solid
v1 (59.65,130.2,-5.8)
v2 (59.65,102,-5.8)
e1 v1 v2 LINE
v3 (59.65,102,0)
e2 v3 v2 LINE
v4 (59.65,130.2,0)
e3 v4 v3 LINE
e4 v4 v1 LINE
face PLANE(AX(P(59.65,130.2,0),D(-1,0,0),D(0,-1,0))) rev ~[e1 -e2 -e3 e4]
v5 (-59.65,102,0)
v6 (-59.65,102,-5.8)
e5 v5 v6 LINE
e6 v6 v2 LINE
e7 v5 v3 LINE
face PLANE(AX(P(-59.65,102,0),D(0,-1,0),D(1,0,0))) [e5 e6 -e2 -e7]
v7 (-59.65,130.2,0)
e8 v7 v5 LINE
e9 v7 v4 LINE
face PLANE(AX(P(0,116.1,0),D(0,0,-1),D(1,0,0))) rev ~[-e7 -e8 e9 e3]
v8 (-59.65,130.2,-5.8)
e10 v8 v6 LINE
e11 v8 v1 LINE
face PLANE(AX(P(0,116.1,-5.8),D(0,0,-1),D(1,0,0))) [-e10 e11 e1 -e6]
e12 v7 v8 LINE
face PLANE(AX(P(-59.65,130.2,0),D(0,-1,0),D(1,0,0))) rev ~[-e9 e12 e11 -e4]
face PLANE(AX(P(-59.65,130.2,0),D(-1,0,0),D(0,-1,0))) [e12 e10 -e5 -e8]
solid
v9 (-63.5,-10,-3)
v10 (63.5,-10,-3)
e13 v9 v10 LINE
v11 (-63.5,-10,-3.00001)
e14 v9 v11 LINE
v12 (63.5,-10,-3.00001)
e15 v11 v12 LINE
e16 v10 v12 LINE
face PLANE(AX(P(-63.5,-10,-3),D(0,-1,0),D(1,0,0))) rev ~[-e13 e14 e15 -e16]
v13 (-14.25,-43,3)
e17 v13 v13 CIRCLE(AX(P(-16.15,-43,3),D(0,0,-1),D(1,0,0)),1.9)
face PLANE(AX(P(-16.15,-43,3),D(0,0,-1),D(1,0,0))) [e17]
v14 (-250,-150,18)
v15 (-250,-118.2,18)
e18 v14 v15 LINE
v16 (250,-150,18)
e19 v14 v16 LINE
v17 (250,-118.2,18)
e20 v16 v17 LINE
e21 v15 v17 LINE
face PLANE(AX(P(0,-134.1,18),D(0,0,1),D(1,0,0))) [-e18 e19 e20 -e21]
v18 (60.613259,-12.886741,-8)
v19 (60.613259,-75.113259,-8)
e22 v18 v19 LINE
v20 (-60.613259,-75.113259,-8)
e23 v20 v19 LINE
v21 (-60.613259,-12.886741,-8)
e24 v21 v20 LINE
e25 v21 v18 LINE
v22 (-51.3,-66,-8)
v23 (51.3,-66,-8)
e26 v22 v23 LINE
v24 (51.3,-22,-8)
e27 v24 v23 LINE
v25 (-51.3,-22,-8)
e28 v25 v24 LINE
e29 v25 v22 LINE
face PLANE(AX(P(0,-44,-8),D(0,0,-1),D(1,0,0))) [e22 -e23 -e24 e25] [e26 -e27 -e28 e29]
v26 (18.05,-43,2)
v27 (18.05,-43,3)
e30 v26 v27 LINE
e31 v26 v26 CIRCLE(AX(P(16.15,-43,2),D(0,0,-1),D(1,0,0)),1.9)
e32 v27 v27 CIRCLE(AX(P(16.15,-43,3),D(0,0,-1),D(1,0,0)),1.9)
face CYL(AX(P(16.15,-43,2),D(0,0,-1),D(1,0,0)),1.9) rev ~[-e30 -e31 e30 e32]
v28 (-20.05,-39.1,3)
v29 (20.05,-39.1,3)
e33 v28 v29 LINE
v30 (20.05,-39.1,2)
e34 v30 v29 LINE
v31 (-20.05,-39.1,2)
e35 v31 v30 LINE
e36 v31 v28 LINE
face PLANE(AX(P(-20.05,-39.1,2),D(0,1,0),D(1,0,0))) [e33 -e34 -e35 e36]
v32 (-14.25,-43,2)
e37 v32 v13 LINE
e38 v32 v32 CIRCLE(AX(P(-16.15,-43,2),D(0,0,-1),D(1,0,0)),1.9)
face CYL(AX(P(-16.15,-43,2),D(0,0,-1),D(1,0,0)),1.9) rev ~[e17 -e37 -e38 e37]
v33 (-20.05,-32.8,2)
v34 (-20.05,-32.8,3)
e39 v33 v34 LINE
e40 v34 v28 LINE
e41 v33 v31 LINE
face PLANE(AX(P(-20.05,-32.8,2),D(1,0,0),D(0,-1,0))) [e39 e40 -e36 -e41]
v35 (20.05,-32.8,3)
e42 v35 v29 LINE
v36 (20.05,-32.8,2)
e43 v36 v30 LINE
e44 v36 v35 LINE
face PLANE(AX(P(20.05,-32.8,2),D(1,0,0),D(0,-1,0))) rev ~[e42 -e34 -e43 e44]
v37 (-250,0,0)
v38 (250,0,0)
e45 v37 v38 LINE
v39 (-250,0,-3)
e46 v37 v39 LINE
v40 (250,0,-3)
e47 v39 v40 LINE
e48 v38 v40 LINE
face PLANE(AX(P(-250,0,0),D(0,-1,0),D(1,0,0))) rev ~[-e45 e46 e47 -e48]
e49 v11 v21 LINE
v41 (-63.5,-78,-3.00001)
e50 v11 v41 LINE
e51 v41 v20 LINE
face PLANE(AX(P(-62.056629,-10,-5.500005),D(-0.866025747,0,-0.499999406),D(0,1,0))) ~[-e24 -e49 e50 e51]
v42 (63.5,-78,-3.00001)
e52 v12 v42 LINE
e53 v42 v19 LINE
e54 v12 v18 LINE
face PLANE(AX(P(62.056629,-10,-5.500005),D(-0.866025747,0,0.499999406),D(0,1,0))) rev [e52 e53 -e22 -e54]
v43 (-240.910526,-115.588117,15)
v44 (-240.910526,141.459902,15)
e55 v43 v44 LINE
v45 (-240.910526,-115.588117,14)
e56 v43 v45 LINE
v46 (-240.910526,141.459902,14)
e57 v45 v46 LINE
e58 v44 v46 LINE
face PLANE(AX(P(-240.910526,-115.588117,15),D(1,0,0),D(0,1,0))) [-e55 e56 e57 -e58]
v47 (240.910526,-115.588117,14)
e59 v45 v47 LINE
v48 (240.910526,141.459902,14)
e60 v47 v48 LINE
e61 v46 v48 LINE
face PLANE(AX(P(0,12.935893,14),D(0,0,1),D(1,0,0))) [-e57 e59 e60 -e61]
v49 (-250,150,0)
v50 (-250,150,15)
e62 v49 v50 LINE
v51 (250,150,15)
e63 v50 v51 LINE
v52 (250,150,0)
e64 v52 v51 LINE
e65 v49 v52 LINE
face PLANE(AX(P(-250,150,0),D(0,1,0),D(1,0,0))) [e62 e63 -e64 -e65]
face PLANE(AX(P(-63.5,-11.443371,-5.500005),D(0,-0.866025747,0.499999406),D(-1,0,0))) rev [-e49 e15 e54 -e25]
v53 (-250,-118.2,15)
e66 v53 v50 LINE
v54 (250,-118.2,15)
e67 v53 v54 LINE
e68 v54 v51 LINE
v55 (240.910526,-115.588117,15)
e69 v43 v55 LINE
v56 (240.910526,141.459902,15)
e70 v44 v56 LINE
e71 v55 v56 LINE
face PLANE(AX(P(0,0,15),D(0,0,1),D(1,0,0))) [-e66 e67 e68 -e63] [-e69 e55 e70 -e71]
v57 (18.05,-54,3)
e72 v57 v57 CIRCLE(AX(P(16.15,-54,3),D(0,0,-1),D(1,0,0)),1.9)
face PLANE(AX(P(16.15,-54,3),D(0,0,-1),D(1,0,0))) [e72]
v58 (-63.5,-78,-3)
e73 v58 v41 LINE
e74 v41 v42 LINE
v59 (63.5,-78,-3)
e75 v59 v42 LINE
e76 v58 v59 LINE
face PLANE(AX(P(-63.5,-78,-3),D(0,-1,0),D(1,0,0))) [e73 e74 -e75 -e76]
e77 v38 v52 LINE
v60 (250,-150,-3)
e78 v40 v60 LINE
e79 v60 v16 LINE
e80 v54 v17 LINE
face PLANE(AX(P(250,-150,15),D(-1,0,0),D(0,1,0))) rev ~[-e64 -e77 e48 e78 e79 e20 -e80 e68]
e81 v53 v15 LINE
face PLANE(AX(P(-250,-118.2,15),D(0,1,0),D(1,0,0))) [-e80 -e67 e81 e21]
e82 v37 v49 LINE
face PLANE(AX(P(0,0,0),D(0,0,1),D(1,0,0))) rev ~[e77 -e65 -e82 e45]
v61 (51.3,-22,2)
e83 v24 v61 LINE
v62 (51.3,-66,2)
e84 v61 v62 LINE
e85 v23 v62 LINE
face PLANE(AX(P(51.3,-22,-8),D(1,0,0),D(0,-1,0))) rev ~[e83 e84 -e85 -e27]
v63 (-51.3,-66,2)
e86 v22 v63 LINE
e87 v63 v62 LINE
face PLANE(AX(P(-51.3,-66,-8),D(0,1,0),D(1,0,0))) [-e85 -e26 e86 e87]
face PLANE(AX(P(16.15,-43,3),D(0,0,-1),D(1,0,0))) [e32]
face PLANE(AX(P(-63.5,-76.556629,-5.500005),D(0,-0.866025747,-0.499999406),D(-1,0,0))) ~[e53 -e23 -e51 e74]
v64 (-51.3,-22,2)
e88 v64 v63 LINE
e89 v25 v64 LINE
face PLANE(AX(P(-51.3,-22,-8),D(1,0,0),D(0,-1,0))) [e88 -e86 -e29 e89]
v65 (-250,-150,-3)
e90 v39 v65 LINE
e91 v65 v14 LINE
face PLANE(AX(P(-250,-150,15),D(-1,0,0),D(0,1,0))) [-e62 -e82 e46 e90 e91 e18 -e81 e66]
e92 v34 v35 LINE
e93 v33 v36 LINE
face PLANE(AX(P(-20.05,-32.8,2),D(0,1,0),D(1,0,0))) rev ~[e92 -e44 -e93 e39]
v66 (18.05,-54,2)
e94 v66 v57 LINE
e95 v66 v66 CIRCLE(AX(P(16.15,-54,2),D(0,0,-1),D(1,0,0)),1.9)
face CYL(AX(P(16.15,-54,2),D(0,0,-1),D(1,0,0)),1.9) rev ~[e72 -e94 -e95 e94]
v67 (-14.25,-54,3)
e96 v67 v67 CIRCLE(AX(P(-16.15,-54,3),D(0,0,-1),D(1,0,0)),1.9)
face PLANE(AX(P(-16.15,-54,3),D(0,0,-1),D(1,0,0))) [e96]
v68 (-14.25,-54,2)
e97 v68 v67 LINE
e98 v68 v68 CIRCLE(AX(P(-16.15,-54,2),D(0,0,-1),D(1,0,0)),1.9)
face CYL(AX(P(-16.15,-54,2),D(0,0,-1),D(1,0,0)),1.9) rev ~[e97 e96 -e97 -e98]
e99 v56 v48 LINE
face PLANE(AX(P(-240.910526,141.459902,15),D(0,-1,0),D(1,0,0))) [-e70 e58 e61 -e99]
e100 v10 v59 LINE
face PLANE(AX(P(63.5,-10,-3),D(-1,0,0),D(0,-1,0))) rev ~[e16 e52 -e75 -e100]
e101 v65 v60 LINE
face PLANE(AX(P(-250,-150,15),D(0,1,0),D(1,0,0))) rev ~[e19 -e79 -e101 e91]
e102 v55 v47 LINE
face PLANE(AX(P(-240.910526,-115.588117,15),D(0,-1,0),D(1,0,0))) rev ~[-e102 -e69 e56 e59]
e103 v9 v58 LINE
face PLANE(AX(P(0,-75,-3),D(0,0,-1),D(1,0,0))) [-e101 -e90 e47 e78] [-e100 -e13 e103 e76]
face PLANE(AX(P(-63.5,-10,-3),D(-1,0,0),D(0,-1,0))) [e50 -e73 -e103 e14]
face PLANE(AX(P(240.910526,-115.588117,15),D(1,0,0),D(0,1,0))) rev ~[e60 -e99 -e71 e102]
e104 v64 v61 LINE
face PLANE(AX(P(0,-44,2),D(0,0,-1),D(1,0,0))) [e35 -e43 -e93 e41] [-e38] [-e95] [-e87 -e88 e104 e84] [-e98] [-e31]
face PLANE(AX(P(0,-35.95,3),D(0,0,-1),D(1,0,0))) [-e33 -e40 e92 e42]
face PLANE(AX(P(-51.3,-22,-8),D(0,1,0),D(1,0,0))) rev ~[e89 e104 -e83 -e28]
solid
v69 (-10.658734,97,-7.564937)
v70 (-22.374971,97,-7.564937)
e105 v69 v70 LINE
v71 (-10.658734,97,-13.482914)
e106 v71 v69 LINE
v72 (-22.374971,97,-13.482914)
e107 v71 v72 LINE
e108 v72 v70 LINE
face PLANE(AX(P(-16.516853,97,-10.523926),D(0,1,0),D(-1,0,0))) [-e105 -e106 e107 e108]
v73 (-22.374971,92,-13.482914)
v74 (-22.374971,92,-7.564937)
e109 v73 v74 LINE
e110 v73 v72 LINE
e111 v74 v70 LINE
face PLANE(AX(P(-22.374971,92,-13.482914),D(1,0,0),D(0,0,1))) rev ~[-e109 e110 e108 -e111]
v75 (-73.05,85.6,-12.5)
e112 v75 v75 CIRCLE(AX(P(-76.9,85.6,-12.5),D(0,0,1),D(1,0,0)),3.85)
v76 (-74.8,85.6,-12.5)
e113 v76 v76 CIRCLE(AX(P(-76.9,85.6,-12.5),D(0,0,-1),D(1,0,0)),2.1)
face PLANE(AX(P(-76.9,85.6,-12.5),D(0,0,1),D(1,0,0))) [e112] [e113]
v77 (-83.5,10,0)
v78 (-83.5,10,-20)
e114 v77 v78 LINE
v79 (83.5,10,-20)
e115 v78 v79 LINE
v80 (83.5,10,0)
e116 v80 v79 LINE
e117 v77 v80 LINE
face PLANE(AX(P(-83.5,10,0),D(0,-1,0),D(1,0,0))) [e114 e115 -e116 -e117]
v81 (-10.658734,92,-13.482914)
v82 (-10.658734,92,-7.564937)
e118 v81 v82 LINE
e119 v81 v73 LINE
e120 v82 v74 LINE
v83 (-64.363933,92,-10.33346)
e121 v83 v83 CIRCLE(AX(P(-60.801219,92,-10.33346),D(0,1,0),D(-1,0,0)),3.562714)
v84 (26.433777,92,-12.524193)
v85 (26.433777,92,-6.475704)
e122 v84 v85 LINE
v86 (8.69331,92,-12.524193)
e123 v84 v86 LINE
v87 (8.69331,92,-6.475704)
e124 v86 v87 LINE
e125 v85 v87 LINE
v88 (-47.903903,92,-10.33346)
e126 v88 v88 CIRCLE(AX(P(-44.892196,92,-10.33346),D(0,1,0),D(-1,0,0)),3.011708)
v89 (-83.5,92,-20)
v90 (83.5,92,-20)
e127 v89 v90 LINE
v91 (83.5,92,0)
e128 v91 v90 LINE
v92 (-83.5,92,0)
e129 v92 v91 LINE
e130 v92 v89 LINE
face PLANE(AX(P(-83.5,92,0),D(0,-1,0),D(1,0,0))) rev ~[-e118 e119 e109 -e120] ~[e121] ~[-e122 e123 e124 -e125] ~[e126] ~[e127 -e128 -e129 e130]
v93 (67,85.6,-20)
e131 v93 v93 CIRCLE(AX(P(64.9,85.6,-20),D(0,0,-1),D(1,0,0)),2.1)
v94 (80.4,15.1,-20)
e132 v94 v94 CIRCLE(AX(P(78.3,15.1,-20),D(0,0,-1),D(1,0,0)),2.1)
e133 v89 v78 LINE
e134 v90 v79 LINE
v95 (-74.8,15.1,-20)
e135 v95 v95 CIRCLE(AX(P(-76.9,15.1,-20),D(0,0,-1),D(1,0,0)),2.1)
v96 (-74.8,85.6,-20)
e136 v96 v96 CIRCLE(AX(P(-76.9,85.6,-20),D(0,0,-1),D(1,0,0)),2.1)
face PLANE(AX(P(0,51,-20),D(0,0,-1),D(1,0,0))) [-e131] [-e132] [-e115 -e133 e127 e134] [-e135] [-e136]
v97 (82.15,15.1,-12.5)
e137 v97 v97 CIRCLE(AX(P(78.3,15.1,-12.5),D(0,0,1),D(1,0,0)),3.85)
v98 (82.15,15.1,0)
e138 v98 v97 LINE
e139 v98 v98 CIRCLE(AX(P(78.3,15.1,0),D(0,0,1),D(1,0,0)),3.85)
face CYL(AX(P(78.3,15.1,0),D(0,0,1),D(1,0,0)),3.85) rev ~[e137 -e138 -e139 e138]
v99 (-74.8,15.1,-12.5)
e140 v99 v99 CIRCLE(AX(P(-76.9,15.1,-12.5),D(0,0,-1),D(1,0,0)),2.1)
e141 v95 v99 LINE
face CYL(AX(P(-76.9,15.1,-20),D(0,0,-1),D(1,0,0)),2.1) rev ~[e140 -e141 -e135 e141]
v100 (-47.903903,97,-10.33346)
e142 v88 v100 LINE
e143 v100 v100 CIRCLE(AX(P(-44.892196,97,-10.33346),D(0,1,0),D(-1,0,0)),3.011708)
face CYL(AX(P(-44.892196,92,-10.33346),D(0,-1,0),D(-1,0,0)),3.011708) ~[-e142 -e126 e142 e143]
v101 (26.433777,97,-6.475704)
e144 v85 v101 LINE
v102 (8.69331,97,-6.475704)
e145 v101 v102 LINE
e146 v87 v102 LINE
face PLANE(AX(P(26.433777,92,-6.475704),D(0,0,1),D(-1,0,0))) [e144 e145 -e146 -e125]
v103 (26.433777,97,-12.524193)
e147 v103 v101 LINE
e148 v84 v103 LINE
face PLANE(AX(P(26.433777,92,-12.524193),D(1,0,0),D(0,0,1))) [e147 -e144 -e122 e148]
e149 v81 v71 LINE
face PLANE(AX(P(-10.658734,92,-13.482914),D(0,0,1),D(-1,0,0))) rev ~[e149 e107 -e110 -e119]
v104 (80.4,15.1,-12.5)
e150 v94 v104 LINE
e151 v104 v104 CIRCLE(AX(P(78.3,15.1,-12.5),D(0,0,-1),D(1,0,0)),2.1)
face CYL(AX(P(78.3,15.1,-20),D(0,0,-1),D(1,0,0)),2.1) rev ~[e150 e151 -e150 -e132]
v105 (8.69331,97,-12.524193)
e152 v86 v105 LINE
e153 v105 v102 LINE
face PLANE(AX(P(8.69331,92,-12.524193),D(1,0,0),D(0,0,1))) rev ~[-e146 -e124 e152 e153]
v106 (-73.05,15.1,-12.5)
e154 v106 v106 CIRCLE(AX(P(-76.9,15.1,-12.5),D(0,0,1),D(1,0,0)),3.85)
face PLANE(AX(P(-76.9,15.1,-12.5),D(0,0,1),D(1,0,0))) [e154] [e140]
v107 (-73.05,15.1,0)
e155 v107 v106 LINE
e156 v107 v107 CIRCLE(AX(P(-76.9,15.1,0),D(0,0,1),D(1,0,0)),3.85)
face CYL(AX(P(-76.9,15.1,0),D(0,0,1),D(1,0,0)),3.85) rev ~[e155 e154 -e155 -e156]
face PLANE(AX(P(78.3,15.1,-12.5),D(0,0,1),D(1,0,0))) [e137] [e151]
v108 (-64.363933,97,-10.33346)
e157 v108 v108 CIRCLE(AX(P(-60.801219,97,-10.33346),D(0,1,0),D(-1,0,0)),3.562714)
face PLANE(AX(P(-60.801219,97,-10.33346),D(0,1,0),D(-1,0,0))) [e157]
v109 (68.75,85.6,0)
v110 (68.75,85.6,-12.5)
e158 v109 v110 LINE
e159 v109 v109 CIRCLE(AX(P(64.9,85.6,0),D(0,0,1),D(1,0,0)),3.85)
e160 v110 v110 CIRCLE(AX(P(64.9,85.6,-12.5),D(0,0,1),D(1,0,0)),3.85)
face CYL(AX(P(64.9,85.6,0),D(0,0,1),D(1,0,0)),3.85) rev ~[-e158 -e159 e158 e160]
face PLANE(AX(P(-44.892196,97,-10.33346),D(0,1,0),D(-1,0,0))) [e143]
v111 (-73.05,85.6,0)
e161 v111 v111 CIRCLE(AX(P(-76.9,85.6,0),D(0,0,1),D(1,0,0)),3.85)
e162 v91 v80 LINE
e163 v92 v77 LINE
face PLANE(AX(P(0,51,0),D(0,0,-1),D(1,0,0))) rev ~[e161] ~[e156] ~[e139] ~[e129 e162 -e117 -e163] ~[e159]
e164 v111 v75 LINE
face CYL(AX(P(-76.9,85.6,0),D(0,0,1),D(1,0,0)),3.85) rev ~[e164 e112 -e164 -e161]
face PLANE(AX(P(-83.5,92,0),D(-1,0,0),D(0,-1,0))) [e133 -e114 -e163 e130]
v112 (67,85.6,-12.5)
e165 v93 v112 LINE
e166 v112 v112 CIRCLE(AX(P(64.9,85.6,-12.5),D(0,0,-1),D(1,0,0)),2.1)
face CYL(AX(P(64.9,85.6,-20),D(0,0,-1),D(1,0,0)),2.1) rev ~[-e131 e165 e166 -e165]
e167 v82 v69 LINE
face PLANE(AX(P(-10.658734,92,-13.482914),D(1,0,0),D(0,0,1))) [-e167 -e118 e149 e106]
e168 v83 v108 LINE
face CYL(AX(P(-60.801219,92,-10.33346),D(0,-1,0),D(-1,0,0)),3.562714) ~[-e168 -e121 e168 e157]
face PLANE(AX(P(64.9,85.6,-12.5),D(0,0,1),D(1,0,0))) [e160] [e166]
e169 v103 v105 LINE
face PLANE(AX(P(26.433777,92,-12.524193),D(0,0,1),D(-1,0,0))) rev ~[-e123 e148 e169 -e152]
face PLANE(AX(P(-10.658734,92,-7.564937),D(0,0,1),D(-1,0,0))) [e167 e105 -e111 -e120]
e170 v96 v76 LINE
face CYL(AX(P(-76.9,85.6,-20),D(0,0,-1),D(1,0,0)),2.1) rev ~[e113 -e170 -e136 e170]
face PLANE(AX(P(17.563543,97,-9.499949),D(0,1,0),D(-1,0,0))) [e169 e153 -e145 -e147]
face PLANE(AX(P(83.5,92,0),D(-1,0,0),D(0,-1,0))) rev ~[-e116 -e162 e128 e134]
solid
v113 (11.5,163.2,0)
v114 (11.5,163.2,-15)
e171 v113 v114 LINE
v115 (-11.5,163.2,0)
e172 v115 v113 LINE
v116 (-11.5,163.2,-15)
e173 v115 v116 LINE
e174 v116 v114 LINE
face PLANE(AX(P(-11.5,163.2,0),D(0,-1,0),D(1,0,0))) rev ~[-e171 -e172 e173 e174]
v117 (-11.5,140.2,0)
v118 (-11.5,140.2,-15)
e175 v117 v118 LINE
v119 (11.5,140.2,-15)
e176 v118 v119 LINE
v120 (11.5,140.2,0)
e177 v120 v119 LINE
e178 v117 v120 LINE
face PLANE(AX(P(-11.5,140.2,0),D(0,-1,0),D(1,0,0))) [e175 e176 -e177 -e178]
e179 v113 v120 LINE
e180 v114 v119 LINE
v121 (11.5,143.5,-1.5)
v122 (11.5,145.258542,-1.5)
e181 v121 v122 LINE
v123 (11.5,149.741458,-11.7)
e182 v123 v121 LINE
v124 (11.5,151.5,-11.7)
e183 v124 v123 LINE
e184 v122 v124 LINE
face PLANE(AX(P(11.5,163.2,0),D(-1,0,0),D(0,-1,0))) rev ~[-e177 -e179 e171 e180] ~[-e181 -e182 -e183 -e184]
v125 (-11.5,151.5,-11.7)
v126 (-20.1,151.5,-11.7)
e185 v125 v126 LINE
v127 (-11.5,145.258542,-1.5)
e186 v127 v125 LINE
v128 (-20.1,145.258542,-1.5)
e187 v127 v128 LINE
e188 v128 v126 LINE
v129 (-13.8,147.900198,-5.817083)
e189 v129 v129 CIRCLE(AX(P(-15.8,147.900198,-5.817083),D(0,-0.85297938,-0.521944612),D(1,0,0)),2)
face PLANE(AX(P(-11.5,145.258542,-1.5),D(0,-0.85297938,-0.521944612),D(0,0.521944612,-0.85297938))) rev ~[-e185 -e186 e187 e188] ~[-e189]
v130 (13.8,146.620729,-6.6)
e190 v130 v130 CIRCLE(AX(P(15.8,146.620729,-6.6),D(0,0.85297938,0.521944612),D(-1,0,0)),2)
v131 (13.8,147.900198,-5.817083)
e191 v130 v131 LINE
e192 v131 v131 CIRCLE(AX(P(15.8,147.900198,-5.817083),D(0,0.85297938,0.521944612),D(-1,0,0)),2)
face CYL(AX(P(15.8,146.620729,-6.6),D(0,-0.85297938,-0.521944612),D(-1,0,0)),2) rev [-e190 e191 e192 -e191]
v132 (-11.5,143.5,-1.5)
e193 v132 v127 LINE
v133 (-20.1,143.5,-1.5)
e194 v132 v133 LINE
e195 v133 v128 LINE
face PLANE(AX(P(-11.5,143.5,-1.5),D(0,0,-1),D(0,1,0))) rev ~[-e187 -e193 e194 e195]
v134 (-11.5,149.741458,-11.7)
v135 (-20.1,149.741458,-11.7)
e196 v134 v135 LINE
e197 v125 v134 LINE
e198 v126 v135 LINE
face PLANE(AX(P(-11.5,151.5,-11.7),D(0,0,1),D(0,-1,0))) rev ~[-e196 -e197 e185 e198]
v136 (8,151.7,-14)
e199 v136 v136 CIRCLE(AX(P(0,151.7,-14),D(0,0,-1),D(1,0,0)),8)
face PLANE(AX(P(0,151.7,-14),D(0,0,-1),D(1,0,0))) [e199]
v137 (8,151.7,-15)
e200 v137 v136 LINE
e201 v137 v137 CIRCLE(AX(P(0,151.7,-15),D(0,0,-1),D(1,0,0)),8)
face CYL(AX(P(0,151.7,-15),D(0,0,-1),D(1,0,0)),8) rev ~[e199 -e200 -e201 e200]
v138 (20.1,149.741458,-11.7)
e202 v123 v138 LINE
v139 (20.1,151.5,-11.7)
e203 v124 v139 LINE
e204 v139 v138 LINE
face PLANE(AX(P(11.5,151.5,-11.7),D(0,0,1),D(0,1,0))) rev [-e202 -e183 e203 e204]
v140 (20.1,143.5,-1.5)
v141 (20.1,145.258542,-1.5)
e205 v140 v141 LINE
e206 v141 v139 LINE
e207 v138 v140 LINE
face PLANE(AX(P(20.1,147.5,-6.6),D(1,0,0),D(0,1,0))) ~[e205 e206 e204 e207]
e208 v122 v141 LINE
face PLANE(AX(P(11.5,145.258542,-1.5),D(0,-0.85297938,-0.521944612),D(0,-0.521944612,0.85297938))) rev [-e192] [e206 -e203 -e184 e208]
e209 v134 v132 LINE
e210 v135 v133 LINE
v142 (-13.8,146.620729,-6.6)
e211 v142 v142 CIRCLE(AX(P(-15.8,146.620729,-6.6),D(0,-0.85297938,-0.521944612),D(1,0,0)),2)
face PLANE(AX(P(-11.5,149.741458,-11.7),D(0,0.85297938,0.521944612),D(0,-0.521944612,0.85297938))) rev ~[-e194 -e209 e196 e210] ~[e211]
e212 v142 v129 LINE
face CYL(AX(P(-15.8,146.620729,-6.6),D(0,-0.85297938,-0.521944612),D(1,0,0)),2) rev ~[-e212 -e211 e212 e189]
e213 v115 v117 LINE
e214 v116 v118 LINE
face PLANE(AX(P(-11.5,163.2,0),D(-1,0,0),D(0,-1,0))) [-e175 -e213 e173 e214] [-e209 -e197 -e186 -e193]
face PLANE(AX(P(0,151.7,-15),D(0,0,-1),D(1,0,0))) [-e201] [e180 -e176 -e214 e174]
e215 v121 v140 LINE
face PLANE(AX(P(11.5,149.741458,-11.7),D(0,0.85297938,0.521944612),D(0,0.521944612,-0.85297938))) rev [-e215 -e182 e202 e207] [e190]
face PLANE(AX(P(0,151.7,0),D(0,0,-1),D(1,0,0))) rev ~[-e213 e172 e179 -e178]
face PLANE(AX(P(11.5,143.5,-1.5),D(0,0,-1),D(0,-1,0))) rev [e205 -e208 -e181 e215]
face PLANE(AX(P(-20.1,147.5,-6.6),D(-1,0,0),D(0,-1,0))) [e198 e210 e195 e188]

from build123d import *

# Parameters (mm, degrees)
F0_W      = 500
F0_H      = 300
F1_DEPTH  = 15
F2_W      = 481.8210515528
F2_H      = 257.048019406
F3_DEPTH  = 1
F4_W      = 500
F4_H      = 150
F5_DEPTH  = 3
F6_W      = 127
F6_H      = 68
F7_DEPTH  = 5
F8_SIZE2  = 2.886741
F8_SIZE   = 4.99999
F9_W      = 102.6
F9_H      = 44
F10_DEPTH = 10
F11_W     = 167
F11_H     = 82
F12_DEPTH = 20
F13_R     = 2.1
F14_DEPTH = 20
F15_R     = 3.85
F16_DEPTH = 12.5
F17_W     = 17.7404675633
F17_H     = 6.0484888963
F17_W_2   = 11.7162363604
F17_H_2   = 5.917977076
F17_R     = 3.0117076701
F17_R_2   = 3.5627139526
F18_DEPTH = 5
F19_W     = 500
F19_H     = 31.8
F20_DEPTH = 3
F21_R     = 1.9
F21_W     = 40.1
F21_H     = 6.3
F22_DEPTH = 1
F23_W     = 119.3
F23_H     = 28.2
F24_DEPTH = 5.8
F25_W     = 23
F25_H     = 23
F26_DEPTH = 15
F28_DEPTH = 8.6
F29_R     = 2
F30_DEPTH = 1.5
F31_R     = 8
F32_DEPTH = 1


# Not quite as in the source:
# - a fillet or chamfer is up to 0.001 mm smaller than in the source, because OpenCascade refuses the exact size
# - a pattern or mirror of a feature is missing from the dataset's text; its kind, count and spacing are read off the source's solid


with BuildPart() as f1:
    # F0 (on Top) → F1 (new body)
    with BuildSketch(Plane.XY):
        Rectangle(F0_W, F0_H)
    extrude(amount=F1_DEPTH)

    # F2 (on face) → F3 (cut)
    with BuildSketch(Plane.XY.offset(15)):
        with Locations((0, 12.9358926788)):
            Rectangle(F2_W, F2_H)
    extrude(amount=-F3_DEPTH, mode=Mode.SUBTRACT)

    # F4 (on face) → F5 (join)
    with BuildSketch(Plane(origin=(0, 0, 0), x_dir=(1, 0, 0), z_dir=(0, 0, -1))):
        with Locations((0, 75)):
            Rectangle(F4_W, F4_H)
    extrude(amount=F5_DEPTH)

    # F6 (on face) → F7 (join)
    with BuildSketch(Plane(origin=(0, 0, -3), x_dir=(1, 0, 0), z_dir=(0, 0, -1))):
        with Locations((0, 44)):
            Rectangle(F6_W, F6_H)
    extrude(amount=F7_DEPTH)

    # F8 (size 5 and 2.8867513459 in the source; OpenCascade refuses exactly that, so slightly less here)
    f8_edges = [f1.edges().sort_by_distance(p)[0] for p in [
        (0, -78, -8),
        (-63.5, -44, -8),
        (0, -10, -8),
        (63.5, -44, -8),
    ]]
    chamfer(f8_edges, length=F8_SIZE, length2=F8_SIZE2)

    # F9 (on face) → F10 (cut)
    with BuildSketch(Plane(origin=(0, 0, -8), x_dir=(1, 0, 0), z_dir=(0, 0, -1))):
        with Locations((0, 44)):
            Rectangle(F9_W, F9_H)
    extrude(amount=-F10_DEPTH, mode=Mode.SUBTRACT)

    # F19 (on face) → F20 (join)
    with BuildSketch(Plane.XY.offset(15)):
        with Locations((0, -134.1)):
            Rectangle(F19_W, F19_H)
    extrude(amount=F20_DEPTH)

    # F21 (on face) → F22 (cut)
    with BuildSketch(Plane(origin=(0, 0, 2), x_dir=(1, 0, 0), z_dir=(0, 0, -1))):
        with Locations((-16.15, 43)):
            Circle(F21_R)
        with Locations((-16.15, 54)):
            Circle(F21_R)
        with Locations((16.15, 54)):
            Circle(F21_R)
        with Locations((16.15, 43)):
            Circle(F21_R)
        with Locations((0, 35.95)):
            Rectangle(F21_W, F21_H)
    extrude(amount=-F22_DEPTH, mode=Mode.SUBTRACT)


with BuildPart() as f12:
    # F11 (on face) → F12 (new body)
    with BuildSketch(Plane(origin=(0, 0, 0), x_dir=(1, 0, 0), z_dir=(0, 0, -1))):
        with Locations((0, -51)):
            Rectangle(F11_W, F11_H)
    extrude(amount=F12_DEPTH)

    # F13 (on face) → F14 (cut, through all)
    with BuildSketch(Plane(origin=(0, 0, -20), x_dir=(1, 0, 0), z_dir=(0, 0, -1))):
        with Locations((64.9, -85.6)):
            Circle(F13_R)
        with Locations((78.3, -15.1)):
            Circle(F13_R)
        with Locations((-76.9, -85.6)):
            Circle(F13_R)
        with Locations((-76.9, -15.1)):
            Circle(F13_R)
    extrude(amount=-F14_DEPTH, mode=Mode.SUBTRACT)

    # F15 (on face) → F16 (cut)
    with BuildSketch(Plane.XY):
        with Locations((-76.9, 15.1)):
            Circle(F15_R)
        with Locations((-76.9, 85.6)):
            Circle(F15_R)
        with Locations((64.9, 85.6)):
            Circle(F15_R)
        with Locations((78.3, 15.1)):
            Circle(F15_R)
    extrude(amount=-F16_DEPTH, mode=Mode.SUBTRACT)

    # F17 (on face) → F18 (join)
    with BuildSketch(Plane(origin=(0, 92, 0), x_dir=(-1, 0, 0), z_dir=(0, 1, 0))):
        with Locations((-17.5635432824, -9.4999487046)):
            Rectangle(F17_W, F17_H)
        with Locations((16.5168526582, -10.5239257682)):
            Rectangle(F17_W_2, F17_H_2)
        with Locations((44.8921956122, -10.3334598243)):
            Circle(F17_R)
        with Locations((60.8012191951, -10.3334598243)):
            Circle(F17_R_2)
    extrude(amount=F18_DEPTH)


with BuildPart() as f24:
    # F23 (on face) → F24 (new body)
    with BuildSketch(Plane(origin=(0, 0, 0), x_dir=(1, 0, 0), z_dir=(0, 0, -1))):
        with Locations((0, -116.1)):
            Rectangle(F23_W, F23_H)
    extrude(amount=F24_DEPTH)


with BuildPart() as f26:
    # F25 (on face) → F26 (new body)
    with BuildSketch(Plane(origin=(0, 0, 0), x_dir=(1, 0, 0), z_dir=(0, 0, -1))):
        with Locations((0, -151.7)):
            Rectangle(F25_W, F25_H)
    extrude(amount=F26_DEPTH)

    # F27 (on face) → F28 (join)
    with BuildSketch(Plane(origin=(-11.5, 0, 0), x_dir=(0, -1, 0), z_dir=(-1, 0, 0))):
        Polygon((-149.7414580757, -11.7), (-143.5, -1.5), (-145.2585419243, -1.5), (-151.5, -11.7), align=None)
    f28 = extrude(amount=F28_DEPTH)

    # F28_copies: F28 across plane
    add(f28.mirror(Plane(origin=(0, 0, 0), x_dir=(0, 0, 1), z_dir=(1, 0, 0))))

    # F29 (on face) → F30 (cut, through all)
    with BuildSketch(Plane(origin=(0, 103.7390315274, 63.4787074597), x_dir=(1, 0, 0), z_dir=(0, -0.8529793798, -0.5219446116))):
        with Locations((-15.8, -82.1575633804)):
            Circle(F29_R)
    f30 = extrude(amount=-F30_DEPTH, mode=Mode.SUBTRACT)

    # F30_copies: F30 across plane
    add(f30.mirror(Plane(origin=(0, 0, 0), x_dir=(0, 0, 1), z_dir=(1, 0, 0))), mode=Mode.SUBTRACT)

    # F31 (on face) → F32 (cut)
    with BuildSketch(Plane(origin=(0, 0, -15), x_dir=(1, 0, 0), z_dir=(0, 0, -1))):
        with Locations((0, -151.7)):
            Circle(F31_R)
    extrude(amount=-F32_DEPTH, mode=Mode.SUBTRACT)


solid = Compound([f1.part, f12.part, f24.part, f26.part])
